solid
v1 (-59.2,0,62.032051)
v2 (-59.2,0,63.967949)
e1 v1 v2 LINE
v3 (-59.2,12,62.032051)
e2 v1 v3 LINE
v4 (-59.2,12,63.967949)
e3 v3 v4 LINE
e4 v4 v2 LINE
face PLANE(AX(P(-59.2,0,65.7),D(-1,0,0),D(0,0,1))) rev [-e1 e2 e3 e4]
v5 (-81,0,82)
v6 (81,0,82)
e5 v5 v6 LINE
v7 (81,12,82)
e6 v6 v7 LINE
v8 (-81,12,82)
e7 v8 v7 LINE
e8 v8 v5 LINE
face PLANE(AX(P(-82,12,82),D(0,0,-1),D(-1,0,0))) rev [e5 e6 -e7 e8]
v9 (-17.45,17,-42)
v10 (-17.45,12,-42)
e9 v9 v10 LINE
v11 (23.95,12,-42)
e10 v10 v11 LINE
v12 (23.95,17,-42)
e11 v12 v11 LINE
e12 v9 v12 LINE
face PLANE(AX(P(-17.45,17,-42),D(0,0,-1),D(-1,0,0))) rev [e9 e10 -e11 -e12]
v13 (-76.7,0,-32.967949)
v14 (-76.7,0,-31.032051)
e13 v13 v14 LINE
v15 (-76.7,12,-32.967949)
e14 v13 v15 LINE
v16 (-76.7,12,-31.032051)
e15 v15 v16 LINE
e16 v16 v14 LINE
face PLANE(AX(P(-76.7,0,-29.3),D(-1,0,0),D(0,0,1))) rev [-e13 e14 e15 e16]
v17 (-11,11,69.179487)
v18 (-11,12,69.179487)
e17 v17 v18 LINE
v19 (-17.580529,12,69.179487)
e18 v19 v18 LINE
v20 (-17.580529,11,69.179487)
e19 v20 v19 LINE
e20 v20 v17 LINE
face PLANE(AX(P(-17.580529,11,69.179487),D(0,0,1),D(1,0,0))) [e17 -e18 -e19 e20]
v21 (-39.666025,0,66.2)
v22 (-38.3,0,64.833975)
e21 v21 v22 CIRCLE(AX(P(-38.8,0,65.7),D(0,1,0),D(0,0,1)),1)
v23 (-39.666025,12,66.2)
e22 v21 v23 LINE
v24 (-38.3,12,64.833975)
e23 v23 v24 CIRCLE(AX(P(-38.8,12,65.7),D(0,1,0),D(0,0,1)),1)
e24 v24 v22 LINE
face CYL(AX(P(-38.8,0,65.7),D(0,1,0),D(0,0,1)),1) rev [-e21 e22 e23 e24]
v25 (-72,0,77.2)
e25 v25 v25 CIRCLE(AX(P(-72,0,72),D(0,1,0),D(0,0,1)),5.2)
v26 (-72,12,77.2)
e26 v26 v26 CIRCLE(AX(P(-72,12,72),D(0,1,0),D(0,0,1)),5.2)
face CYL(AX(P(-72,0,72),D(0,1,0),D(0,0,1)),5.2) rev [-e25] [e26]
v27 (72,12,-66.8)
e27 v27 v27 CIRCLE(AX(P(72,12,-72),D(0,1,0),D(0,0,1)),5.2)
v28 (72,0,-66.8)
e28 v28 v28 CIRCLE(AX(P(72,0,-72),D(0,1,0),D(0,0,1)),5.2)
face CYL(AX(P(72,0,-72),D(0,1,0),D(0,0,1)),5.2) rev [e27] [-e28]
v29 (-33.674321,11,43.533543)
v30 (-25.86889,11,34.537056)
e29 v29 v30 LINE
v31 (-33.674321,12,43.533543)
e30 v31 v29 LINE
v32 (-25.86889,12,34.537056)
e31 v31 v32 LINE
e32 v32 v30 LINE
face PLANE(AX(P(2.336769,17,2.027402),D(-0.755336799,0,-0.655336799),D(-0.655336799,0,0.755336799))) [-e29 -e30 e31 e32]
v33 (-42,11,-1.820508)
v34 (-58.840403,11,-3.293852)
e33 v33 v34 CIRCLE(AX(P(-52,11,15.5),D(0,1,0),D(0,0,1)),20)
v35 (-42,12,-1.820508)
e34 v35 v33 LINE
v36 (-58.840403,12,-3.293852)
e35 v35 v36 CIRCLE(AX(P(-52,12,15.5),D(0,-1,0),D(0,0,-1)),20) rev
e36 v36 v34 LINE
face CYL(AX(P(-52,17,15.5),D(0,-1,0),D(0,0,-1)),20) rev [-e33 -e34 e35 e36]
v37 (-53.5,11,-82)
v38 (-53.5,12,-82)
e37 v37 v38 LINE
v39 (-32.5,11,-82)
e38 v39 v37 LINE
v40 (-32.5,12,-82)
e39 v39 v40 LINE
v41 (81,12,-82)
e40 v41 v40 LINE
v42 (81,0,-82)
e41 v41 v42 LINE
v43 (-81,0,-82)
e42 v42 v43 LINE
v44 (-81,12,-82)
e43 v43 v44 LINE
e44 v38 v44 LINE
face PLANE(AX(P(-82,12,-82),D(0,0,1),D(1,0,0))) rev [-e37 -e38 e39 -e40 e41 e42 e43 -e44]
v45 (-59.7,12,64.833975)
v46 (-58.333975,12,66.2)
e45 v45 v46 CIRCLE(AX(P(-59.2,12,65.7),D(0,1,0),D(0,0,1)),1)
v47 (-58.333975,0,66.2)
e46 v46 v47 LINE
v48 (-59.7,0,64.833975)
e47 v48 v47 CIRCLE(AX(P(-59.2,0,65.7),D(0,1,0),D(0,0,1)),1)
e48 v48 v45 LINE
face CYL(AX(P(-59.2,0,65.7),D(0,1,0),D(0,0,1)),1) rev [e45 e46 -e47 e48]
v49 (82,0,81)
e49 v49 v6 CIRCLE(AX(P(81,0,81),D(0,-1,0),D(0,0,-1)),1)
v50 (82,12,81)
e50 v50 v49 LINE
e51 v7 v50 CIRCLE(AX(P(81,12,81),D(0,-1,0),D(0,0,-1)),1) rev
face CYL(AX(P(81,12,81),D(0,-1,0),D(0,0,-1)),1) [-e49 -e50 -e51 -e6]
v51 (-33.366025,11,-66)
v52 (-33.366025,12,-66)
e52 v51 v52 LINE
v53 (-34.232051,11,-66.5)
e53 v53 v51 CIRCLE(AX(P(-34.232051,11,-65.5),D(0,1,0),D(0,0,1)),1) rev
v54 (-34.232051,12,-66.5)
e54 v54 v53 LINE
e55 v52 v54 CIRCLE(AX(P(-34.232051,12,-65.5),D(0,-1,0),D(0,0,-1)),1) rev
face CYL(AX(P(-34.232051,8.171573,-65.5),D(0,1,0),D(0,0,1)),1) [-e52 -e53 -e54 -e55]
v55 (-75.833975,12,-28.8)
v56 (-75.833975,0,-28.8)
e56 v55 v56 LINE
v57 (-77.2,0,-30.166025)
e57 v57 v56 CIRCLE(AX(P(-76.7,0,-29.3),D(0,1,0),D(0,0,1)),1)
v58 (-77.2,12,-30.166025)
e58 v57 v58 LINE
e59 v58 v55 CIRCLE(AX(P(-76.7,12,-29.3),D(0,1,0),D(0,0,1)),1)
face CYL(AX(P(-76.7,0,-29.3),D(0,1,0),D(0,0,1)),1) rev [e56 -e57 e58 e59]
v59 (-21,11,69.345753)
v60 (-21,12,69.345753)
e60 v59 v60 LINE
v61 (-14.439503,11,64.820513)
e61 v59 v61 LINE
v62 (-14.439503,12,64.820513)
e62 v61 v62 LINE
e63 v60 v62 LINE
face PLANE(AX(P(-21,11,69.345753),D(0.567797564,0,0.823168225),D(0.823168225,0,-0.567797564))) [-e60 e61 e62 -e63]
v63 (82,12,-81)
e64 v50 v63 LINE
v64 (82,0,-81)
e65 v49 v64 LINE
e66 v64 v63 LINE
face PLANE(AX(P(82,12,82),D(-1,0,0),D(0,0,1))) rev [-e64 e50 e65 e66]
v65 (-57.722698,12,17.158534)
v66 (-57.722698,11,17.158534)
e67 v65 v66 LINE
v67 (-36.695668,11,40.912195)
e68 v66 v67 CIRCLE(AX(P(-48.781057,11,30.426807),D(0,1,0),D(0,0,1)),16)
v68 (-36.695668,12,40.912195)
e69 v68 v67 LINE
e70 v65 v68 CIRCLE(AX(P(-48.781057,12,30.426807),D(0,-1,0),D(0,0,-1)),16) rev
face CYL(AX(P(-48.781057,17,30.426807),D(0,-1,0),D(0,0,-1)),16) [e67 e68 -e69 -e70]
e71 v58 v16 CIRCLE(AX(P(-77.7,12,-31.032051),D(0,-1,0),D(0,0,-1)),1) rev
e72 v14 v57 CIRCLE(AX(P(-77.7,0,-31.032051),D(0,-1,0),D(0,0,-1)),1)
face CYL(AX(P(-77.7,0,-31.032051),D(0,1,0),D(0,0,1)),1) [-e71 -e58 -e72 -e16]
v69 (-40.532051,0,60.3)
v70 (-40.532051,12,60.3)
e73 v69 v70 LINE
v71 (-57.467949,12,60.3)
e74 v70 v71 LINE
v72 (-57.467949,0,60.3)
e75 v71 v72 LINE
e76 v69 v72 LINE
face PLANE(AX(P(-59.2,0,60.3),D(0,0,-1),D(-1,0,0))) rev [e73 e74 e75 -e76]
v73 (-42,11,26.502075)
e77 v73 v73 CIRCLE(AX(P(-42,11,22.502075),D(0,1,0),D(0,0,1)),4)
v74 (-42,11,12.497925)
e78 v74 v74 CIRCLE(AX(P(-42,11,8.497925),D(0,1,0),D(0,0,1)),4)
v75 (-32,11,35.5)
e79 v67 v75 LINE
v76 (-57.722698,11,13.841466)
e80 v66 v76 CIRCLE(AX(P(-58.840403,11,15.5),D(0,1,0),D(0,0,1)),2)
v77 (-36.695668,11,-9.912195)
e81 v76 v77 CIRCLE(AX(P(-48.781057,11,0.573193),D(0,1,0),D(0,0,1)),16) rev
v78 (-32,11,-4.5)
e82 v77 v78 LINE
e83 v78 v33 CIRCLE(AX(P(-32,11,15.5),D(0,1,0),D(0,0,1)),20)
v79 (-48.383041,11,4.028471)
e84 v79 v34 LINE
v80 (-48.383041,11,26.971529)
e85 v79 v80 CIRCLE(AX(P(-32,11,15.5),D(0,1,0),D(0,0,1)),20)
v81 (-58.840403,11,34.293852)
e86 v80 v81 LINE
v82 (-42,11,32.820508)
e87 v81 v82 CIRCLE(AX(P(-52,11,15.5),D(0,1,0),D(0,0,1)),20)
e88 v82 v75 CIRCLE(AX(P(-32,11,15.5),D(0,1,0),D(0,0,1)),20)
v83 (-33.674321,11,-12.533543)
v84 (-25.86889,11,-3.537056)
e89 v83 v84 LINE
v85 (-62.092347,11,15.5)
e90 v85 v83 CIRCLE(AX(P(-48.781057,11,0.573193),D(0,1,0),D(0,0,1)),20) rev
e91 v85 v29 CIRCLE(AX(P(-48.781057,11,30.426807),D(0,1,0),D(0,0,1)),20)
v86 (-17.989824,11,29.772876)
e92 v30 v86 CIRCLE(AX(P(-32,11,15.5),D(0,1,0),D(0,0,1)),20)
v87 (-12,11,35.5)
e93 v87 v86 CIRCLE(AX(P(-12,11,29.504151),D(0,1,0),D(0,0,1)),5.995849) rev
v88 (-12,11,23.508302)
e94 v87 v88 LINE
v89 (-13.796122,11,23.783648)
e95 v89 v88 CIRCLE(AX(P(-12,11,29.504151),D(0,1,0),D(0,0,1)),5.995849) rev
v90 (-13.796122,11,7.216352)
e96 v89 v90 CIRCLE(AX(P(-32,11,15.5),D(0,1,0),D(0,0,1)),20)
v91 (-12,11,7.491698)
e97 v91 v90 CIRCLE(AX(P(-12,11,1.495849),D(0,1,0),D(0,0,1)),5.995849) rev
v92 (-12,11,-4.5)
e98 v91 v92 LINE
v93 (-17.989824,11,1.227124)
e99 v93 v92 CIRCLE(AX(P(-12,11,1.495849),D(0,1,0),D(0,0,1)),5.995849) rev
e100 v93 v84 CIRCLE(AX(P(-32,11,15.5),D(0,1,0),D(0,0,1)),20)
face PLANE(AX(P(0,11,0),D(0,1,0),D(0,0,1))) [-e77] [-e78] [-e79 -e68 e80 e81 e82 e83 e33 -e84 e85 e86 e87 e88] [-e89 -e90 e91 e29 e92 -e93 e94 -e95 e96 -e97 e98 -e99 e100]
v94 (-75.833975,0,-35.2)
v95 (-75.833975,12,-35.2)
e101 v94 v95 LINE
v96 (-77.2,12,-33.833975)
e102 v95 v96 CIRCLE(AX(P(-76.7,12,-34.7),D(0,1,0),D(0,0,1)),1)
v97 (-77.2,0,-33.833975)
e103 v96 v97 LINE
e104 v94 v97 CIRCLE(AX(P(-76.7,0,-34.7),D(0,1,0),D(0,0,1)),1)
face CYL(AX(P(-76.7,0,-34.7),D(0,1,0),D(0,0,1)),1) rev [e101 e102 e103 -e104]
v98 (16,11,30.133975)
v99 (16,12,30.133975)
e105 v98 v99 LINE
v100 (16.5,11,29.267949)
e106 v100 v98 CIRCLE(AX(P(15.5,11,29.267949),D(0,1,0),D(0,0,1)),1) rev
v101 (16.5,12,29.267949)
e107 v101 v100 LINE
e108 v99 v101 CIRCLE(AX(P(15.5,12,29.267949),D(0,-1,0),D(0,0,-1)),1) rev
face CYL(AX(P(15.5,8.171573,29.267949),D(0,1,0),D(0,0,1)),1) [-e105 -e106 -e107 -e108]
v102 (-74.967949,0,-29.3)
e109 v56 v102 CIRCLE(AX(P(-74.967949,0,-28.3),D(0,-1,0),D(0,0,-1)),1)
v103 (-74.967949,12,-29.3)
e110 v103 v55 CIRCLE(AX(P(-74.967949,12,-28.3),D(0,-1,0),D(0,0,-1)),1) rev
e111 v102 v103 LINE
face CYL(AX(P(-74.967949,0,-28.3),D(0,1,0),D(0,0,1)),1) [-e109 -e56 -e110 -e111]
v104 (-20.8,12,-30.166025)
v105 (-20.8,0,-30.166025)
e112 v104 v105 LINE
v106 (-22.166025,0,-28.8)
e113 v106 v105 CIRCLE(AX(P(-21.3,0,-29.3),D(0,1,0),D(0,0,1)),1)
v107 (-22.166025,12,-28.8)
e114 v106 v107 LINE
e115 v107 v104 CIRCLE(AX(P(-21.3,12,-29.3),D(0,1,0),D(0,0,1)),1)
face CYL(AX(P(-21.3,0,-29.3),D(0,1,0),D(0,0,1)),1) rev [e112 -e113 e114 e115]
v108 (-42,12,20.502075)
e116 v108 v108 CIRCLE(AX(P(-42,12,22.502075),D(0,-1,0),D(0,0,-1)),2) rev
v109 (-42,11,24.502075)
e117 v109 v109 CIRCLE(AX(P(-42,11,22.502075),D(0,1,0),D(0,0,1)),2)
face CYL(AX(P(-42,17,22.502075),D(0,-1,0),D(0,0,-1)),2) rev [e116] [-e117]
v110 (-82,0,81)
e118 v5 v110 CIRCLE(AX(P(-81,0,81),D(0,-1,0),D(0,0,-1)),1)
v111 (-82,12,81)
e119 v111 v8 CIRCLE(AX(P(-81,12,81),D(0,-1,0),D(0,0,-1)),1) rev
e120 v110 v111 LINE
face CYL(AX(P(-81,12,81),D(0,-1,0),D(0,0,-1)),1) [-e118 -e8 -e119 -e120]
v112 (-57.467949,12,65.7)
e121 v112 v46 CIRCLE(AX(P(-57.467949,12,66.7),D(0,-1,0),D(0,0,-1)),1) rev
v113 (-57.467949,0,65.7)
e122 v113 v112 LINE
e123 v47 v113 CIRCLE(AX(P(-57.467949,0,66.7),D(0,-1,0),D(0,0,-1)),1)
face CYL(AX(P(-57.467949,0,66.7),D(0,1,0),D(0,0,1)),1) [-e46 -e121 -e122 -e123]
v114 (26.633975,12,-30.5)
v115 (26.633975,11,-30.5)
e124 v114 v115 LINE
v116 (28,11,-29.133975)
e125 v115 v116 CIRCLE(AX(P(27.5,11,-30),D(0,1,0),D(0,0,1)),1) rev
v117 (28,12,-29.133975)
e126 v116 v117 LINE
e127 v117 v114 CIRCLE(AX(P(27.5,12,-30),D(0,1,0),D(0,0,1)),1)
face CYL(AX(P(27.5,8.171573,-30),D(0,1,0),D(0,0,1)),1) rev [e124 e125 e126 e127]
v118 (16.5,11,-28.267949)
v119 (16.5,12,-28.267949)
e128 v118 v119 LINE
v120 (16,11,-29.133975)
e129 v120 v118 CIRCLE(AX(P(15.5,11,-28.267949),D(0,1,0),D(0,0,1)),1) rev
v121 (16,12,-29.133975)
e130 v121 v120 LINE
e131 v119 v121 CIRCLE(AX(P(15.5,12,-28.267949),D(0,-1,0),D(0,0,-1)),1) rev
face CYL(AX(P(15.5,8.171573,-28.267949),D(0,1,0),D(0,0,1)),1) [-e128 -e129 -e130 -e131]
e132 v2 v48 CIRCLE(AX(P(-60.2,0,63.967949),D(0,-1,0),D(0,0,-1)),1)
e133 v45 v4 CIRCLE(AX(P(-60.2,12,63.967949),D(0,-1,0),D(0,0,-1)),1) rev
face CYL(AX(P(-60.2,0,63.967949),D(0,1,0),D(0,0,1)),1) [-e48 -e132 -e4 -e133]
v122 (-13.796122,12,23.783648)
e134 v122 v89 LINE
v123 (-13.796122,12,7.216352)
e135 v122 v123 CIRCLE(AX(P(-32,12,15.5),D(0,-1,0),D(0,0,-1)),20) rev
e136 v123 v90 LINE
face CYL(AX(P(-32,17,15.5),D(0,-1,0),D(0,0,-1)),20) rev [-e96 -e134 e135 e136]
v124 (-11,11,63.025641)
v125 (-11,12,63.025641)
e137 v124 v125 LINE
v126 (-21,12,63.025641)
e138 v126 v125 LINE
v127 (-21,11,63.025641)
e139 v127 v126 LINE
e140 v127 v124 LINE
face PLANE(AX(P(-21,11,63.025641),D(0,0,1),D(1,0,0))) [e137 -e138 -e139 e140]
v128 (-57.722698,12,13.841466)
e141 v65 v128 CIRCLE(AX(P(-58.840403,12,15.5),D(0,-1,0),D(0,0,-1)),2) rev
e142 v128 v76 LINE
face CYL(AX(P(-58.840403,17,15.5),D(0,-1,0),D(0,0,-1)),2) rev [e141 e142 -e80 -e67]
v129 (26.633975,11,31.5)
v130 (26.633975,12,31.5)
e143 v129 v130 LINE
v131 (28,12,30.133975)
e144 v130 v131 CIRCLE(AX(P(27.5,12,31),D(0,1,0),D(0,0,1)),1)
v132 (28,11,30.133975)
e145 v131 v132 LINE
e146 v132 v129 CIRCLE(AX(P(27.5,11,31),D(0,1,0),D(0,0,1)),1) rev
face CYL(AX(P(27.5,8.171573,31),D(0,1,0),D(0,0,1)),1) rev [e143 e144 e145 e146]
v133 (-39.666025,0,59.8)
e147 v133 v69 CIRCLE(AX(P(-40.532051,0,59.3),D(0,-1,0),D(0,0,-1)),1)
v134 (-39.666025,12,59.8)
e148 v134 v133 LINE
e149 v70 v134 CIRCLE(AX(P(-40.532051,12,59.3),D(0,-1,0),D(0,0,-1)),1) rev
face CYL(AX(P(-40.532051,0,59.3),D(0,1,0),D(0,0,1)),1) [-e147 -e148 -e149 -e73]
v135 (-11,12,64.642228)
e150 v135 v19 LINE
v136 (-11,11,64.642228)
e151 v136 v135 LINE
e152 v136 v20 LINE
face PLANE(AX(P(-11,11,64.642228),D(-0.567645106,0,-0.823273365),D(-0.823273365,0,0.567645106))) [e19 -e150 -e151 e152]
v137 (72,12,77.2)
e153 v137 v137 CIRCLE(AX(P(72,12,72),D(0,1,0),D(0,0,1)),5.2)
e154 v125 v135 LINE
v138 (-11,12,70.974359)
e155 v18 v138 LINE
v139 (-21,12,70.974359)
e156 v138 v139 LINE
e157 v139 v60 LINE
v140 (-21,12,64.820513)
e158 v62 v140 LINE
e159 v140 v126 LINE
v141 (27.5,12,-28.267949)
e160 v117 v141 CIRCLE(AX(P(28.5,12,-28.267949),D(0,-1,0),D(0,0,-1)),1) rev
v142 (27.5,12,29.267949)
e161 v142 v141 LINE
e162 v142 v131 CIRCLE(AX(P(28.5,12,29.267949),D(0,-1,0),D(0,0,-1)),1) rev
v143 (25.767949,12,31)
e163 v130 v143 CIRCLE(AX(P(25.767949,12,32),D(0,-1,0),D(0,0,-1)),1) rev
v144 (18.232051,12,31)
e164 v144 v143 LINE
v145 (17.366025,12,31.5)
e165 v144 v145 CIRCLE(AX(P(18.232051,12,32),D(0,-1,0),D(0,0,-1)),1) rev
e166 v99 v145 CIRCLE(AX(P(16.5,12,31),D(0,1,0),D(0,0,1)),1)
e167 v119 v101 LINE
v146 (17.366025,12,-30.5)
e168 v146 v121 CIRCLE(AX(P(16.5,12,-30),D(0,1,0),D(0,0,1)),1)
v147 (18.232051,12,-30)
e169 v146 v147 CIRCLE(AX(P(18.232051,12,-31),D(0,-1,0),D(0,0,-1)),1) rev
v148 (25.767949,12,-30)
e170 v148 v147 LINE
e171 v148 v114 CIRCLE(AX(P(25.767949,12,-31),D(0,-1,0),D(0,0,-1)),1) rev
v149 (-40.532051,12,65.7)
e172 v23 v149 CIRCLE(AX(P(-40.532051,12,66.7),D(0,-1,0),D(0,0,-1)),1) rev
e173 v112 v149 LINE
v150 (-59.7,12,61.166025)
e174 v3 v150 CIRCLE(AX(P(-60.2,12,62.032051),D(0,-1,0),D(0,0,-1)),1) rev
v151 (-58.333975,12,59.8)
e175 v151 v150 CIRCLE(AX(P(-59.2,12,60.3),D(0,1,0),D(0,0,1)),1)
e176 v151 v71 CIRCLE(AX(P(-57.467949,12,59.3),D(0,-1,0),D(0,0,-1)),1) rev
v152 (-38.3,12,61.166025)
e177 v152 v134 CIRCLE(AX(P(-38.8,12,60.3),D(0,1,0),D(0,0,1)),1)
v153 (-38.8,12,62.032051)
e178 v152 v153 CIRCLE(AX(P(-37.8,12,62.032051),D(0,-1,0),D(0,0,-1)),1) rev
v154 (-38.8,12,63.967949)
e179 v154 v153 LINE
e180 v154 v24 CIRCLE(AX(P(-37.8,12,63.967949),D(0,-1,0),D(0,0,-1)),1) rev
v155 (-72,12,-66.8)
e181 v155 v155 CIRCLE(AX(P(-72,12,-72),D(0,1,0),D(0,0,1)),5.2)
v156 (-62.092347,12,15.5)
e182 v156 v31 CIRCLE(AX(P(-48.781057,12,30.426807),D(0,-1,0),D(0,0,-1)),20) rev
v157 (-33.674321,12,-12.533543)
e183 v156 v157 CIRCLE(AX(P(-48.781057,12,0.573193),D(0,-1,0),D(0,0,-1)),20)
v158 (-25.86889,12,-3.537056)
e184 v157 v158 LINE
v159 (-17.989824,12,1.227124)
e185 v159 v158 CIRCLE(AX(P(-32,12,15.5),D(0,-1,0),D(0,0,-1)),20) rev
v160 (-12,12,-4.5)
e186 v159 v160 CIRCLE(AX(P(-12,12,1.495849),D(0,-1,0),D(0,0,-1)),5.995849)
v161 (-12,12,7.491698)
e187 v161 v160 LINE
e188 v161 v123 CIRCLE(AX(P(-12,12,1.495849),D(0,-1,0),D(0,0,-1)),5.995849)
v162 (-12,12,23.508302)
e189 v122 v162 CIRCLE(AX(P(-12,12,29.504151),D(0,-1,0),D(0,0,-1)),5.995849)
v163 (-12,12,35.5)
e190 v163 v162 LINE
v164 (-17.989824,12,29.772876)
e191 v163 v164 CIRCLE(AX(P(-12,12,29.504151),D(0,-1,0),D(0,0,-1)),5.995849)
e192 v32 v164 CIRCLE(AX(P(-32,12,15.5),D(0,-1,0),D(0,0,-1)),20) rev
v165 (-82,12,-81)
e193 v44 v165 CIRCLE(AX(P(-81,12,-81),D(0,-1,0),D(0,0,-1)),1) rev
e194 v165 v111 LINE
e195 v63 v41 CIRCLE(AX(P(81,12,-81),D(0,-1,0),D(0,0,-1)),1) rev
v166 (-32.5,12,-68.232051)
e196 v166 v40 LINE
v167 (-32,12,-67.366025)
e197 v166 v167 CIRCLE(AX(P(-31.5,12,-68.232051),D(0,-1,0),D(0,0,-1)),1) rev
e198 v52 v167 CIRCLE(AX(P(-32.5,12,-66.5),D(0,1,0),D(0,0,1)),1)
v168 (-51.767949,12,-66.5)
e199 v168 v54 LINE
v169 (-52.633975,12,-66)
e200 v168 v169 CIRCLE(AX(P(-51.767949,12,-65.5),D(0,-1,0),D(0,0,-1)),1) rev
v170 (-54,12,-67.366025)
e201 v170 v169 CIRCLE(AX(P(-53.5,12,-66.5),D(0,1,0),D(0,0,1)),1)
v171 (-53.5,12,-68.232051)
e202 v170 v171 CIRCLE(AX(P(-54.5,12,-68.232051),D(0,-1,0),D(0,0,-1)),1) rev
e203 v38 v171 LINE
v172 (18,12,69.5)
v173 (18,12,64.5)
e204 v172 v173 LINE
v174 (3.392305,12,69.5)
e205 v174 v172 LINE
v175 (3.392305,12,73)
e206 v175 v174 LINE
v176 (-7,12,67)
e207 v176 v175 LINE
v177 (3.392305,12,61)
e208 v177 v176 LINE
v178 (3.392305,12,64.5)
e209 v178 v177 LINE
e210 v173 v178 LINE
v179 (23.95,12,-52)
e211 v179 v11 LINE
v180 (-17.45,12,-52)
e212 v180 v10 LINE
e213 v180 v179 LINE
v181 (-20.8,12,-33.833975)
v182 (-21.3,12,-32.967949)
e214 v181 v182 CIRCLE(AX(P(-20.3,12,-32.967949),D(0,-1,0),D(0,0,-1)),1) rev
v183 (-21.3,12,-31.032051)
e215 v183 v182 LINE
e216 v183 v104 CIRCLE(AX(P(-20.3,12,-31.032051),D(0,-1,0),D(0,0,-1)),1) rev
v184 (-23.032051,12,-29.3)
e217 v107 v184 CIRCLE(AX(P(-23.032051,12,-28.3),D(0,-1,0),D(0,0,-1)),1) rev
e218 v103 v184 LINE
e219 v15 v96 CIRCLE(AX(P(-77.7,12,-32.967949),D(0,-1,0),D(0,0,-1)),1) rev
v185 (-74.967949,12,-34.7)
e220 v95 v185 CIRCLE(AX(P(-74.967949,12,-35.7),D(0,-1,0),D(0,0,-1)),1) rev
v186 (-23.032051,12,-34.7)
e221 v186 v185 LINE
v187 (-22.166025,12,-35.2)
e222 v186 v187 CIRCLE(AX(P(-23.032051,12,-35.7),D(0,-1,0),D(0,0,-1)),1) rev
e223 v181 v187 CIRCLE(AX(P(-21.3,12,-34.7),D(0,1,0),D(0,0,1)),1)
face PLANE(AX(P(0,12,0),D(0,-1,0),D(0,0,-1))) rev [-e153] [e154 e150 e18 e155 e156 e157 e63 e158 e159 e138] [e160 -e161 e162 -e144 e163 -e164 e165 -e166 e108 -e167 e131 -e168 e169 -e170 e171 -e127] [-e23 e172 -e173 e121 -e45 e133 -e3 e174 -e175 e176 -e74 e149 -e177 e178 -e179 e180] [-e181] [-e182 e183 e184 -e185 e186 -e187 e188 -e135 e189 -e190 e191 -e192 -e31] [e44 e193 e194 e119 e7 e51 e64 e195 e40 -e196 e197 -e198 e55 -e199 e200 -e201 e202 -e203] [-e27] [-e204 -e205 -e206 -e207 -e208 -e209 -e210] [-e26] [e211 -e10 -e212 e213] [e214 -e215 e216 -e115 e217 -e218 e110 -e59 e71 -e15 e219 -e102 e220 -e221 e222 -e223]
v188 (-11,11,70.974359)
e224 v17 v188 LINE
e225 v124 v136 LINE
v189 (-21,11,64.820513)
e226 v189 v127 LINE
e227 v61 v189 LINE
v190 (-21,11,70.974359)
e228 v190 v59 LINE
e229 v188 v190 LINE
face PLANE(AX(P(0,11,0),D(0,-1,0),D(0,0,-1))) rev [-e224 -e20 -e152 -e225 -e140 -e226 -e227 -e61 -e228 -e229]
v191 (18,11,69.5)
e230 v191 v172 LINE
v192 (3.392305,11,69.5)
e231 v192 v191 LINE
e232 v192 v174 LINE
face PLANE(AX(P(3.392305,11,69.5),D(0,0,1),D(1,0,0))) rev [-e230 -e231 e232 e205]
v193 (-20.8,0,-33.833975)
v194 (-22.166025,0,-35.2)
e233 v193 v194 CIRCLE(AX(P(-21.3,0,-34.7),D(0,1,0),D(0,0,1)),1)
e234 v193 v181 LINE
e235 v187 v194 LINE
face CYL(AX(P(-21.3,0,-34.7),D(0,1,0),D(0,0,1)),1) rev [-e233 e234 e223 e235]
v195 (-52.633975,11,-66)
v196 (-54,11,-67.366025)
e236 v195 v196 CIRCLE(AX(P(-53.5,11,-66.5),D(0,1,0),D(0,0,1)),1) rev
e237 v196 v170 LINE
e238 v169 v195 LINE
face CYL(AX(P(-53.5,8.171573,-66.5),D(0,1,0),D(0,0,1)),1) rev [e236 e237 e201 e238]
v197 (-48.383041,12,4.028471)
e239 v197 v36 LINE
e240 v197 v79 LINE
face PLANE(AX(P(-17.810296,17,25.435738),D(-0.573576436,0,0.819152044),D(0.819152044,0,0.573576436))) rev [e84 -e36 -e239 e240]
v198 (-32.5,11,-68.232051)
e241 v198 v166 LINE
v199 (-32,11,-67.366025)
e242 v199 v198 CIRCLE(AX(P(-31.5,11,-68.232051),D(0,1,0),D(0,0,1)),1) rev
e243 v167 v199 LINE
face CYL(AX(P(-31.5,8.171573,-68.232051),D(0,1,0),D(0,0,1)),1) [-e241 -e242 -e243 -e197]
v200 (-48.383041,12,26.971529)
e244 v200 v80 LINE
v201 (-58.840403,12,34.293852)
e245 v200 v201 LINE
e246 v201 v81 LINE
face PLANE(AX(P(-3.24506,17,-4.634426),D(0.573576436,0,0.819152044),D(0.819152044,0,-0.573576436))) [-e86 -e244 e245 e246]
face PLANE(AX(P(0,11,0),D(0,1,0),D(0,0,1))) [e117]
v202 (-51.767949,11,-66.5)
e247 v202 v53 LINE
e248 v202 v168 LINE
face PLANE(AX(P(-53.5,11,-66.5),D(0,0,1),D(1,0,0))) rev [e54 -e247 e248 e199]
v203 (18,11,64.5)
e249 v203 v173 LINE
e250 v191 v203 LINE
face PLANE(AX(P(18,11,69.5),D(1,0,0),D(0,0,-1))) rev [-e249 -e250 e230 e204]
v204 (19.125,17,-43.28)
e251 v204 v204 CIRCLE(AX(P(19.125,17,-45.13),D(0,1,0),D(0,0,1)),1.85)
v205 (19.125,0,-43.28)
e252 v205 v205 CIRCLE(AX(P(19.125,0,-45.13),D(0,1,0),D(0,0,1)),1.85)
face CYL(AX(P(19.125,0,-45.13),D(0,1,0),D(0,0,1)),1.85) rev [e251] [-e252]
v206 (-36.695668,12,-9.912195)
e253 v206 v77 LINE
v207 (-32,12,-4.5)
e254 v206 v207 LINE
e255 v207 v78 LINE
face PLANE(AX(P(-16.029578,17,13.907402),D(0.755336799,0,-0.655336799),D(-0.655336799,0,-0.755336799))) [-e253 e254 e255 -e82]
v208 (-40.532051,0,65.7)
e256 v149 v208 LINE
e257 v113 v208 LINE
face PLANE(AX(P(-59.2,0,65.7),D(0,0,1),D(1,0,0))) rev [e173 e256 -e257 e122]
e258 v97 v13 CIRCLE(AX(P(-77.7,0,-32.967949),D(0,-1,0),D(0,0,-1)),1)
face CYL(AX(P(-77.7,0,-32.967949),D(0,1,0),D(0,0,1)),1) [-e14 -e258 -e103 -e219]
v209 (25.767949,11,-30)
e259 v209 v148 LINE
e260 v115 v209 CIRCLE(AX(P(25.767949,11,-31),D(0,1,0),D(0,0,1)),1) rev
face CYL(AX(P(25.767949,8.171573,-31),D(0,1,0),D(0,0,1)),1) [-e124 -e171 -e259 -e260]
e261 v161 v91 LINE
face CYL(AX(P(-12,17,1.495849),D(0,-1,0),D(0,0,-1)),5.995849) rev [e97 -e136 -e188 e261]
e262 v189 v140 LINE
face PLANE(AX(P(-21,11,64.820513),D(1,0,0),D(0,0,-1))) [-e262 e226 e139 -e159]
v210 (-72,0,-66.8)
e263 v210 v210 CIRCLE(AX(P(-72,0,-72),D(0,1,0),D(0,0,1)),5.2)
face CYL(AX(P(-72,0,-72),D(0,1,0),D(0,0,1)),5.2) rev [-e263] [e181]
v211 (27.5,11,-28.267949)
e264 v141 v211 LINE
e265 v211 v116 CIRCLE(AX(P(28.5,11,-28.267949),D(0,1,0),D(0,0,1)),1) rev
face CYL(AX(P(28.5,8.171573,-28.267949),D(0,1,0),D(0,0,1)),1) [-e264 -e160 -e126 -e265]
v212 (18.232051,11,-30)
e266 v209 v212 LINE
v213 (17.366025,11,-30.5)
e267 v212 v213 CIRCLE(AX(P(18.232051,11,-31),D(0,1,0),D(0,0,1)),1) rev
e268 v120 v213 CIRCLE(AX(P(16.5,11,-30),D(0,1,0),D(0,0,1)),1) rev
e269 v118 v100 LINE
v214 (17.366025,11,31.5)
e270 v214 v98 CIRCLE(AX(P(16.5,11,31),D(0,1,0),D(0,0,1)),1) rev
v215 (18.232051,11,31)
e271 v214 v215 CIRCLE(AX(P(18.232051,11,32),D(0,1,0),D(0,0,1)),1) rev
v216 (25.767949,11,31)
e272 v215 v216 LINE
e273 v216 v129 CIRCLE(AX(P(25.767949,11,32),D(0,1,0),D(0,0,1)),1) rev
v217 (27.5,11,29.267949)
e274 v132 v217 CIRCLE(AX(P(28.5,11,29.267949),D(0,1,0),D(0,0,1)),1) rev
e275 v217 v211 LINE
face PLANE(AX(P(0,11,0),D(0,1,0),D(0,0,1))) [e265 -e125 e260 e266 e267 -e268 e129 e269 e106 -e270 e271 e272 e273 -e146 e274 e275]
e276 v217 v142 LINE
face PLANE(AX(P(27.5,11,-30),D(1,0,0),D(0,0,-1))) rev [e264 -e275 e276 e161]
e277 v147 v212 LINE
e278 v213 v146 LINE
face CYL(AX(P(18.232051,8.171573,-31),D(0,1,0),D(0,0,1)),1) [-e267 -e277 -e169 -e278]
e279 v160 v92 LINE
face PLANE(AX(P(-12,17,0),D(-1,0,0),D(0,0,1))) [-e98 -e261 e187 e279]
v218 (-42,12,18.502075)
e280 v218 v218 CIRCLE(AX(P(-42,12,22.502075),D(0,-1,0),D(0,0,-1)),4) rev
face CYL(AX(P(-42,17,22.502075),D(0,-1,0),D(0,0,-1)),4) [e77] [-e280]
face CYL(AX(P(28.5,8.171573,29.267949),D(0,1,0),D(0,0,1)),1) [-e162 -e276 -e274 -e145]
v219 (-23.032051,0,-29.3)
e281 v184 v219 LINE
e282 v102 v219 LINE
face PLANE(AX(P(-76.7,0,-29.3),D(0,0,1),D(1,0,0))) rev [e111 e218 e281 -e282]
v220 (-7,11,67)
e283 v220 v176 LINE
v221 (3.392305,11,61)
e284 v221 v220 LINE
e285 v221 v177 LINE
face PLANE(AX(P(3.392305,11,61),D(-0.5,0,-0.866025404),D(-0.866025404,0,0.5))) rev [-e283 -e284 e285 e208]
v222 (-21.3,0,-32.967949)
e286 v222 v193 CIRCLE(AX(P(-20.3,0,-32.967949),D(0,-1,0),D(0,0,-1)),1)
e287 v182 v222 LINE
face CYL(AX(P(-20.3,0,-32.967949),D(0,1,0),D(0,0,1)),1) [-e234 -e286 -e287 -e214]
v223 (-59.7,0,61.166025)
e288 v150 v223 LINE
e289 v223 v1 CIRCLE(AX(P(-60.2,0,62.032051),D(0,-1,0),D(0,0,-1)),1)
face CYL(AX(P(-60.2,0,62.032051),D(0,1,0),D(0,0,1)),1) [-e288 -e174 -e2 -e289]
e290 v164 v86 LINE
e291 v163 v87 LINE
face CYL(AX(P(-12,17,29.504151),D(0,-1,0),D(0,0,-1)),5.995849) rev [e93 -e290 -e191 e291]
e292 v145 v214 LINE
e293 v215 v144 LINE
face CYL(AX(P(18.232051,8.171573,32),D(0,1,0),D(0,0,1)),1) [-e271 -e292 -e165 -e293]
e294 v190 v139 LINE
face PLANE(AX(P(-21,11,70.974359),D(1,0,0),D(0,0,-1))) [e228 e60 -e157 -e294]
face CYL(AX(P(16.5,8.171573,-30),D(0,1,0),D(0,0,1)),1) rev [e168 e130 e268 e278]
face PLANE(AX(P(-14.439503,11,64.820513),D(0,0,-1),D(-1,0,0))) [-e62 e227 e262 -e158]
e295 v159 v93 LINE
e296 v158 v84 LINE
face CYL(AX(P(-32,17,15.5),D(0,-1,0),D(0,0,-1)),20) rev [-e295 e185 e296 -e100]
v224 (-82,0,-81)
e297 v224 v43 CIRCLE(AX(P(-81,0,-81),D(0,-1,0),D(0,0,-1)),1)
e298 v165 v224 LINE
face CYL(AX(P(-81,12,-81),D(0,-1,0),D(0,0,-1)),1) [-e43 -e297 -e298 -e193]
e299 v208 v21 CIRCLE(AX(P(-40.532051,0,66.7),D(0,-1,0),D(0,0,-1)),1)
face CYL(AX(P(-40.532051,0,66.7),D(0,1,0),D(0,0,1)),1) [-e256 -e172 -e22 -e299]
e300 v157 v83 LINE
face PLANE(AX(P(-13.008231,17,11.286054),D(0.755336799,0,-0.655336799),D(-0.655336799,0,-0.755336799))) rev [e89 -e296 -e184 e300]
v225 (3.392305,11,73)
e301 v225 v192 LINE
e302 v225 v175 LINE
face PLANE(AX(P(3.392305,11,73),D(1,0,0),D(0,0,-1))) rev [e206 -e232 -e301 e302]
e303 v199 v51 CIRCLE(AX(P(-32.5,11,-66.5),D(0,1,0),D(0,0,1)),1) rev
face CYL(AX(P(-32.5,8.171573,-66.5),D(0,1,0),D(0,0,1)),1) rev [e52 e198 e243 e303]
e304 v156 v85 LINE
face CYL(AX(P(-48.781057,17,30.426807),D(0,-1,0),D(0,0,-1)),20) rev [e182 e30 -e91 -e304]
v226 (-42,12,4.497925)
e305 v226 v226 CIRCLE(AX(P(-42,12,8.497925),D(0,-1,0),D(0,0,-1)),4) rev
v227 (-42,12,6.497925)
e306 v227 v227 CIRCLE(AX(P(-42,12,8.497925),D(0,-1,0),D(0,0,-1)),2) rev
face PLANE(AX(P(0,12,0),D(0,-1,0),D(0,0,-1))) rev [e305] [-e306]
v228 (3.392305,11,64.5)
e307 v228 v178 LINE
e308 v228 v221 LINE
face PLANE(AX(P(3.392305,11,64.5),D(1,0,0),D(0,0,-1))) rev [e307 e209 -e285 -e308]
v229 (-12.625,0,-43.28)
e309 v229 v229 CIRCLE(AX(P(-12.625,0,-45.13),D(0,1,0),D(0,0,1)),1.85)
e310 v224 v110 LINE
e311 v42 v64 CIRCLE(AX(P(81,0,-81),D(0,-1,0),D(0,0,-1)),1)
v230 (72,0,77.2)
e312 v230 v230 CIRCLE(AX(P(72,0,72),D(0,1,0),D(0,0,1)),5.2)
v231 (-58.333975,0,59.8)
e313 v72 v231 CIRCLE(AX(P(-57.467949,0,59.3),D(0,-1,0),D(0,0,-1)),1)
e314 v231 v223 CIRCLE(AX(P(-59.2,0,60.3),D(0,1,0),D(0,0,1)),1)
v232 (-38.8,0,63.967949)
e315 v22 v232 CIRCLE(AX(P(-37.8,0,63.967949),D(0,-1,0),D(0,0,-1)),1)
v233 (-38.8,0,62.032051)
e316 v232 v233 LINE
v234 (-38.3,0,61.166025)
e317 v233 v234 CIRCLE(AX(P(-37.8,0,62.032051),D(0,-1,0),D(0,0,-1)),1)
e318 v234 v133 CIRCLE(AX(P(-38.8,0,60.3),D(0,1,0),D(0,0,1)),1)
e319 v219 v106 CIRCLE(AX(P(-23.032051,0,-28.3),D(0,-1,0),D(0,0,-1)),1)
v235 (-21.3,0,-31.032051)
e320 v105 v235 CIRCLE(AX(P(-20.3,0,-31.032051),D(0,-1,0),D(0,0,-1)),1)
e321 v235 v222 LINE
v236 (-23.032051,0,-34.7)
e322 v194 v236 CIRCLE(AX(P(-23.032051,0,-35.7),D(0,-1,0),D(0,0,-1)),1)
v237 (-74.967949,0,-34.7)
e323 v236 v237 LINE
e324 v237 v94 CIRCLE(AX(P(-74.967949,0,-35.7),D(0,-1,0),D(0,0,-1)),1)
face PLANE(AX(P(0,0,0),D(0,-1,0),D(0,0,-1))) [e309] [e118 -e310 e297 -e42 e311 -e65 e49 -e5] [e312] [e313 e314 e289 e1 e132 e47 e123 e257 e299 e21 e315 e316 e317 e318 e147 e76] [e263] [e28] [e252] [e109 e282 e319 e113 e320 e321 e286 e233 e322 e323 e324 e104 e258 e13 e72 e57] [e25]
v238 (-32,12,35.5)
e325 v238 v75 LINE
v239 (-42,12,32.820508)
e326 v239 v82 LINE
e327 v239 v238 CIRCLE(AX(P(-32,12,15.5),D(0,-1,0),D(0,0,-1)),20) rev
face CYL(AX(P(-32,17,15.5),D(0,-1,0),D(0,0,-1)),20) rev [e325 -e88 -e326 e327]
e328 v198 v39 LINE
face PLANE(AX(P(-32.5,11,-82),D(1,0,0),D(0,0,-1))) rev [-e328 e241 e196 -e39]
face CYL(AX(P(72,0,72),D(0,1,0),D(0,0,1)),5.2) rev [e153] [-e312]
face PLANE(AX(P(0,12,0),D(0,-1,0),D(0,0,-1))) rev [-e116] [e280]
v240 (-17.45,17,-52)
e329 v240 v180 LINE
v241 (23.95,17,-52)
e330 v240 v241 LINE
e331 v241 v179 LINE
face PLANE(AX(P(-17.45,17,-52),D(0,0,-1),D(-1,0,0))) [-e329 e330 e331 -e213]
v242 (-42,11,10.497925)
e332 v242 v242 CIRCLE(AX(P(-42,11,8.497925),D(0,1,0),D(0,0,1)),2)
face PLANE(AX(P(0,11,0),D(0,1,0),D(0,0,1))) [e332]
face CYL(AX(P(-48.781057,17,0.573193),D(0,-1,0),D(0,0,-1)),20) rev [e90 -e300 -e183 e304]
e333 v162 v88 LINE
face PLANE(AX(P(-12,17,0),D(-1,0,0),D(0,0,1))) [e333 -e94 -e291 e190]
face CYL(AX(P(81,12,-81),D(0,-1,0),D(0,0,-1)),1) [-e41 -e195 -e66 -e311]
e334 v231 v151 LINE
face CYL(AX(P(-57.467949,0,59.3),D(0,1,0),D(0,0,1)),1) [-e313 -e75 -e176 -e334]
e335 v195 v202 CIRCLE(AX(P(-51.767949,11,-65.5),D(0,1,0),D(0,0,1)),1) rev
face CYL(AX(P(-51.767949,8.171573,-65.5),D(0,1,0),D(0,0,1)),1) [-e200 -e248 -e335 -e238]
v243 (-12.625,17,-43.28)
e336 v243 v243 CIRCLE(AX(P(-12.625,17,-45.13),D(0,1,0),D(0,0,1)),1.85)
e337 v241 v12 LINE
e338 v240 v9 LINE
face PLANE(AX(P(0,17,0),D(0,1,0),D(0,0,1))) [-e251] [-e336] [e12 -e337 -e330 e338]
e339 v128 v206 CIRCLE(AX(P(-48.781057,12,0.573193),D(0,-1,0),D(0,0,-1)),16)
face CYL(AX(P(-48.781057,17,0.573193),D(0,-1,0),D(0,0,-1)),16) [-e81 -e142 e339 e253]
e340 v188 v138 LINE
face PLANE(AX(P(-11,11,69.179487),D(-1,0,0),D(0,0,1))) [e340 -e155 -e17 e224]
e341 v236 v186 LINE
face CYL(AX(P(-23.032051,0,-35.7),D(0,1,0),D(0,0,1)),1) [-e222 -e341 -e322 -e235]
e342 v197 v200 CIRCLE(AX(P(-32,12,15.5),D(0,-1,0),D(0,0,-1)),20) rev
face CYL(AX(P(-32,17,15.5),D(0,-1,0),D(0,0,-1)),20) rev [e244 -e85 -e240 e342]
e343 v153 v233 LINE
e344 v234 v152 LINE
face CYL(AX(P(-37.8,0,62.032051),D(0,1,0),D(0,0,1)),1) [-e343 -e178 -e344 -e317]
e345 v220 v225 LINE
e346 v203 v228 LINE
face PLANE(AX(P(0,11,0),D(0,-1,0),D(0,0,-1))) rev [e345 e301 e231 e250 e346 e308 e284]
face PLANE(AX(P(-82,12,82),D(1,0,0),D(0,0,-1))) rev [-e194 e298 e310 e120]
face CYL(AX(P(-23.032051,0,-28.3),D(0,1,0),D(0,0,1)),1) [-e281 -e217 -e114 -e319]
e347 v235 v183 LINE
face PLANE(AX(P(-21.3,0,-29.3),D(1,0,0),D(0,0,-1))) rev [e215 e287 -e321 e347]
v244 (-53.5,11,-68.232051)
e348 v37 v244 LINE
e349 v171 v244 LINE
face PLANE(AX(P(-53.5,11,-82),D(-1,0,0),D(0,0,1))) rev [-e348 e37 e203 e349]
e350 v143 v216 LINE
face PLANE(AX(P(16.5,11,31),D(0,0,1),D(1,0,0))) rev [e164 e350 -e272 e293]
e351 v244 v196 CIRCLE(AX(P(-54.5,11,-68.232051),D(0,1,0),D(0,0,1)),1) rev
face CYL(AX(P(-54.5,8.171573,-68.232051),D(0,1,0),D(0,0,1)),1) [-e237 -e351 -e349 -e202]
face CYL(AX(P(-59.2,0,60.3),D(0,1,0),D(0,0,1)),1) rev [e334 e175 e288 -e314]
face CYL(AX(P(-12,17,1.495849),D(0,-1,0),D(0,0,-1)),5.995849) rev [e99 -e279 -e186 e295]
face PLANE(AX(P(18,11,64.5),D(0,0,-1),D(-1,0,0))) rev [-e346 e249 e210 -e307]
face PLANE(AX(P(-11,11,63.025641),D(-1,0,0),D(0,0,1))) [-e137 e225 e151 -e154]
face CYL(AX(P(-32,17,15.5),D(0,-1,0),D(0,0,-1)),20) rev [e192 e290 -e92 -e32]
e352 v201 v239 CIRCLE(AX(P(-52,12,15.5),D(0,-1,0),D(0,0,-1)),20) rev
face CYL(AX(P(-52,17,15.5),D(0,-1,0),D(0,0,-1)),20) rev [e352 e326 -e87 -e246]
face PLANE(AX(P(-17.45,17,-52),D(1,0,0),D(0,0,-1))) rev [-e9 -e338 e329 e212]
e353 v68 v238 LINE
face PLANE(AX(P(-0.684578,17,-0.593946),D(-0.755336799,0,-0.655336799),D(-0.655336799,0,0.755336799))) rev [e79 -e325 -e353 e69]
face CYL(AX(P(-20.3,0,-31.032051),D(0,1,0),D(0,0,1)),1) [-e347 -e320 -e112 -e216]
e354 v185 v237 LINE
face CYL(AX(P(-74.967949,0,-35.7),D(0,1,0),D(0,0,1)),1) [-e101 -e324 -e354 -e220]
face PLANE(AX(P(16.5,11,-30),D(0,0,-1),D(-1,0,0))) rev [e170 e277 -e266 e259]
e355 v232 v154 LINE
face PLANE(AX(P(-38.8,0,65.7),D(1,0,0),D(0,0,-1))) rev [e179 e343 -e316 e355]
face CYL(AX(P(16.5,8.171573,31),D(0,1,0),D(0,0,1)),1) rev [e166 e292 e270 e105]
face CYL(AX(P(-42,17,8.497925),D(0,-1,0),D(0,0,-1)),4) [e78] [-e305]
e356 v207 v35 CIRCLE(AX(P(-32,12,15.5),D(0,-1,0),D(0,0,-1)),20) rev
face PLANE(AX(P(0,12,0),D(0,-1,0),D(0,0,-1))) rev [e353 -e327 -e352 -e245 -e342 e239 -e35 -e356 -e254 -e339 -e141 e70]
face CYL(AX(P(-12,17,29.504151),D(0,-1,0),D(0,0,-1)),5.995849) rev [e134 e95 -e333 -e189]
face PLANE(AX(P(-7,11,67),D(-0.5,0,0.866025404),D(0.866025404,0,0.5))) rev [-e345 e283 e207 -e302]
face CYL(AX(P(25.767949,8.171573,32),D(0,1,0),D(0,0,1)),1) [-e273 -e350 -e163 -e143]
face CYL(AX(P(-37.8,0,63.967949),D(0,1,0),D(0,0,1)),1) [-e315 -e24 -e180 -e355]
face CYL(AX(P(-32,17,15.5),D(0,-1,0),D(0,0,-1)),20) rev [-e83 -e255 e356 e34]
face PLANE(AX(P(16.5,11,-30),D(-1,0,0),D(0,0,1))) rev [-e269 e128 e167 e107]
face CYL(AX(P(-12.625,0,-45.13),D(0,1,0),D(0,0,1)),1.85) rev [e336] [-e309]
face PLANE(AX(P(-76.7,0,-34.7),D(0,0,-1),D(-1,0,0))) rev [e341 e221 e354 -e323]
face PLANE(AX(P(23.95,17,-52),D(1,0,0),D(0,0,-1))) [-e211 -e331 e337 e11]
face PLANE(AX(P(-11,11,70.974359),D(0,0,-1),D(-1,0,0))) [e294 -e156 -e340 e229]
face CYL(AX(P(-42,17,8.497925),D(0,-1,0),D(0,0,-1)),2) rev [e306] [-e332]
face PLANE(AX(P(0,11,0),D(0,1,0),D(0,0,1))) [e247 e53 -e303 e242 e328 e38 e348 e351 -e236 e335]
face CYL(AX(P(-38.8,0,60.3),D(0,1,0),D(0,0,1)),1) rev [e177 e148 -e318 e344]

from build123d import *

# Parameters (mm, degrees)
SKICA1_W                        = 164
SKICA1_H                        = 164
P_IDAT_VYSUNUT_M1_DEPTH         = 12
SKICA2_R                        = 5.2
ODEBRAT_VYSUNUT_M1_DEPTH        = 117.584733134
SKICA3_W                        = 55.4
SKICA3_H                        = 5.4
SKICA3_W_2                      = 20.4
ODEBRAT_VYSUNUT_M2_DEPTH        = 117.584733134
ODEBRAT_VYSUNUT_M3_DEPTH        = 1
ZAOBLIT1_R                      = 1
SKICA10_W                       = 41.4
SKICA10_H                       = 10
P_IDAT_VYSUNUT_M2_DEPTH         = 5
ODEBRAT_VYSUNUT_M6_DEPTH        = 117.584733134
ODEBRAT_VYSUNUT_M6_DEPTH_BACK   = 117.584733134
SKICA10_3_R                     = 1.85
SKICA11_W                       = 21
SKICA11_H                       = 15.5
SKICA11_W_2                     = 11
SKICA11_H_2                     = 61
ODEBRAT_VYSUNUT_M7_DEPTH        = 1
SKICA12_R                       = 1
ODEBRAT_VYSUNUT_M8_DEPTH        = 117.584733134
ZAOBLIT2_R                      = 1
SKICA13_R                       = 1
ODEBRAT_VYSUNUT_M9_DEPTH        = 1
ZAOBLIT3_R                      = 1
ODEBRAT_START                   = 11
ODEBRAT_VYSUNUT_M11_OUTLINE_R   = 4
ODEBRAT_VYSUNUT_M11_OUTLINE_R_2 = 2
ODEBRAT_VYSUNUT_M11_DEPTH       = 1


# Read off the part's stored shape, not the designer's step: Odebrat vysunutím11
with BuildPart() as part:
    # Skica1 → Přidat vysunutím1 (new body)
    with BuildSketch(Plane(origin=(0, 0, 0), x_dir=(1, 0, 0), z_dir=(0, 1, 0))):
        Rectangle(SKICA1_W, SKICA1_H)
    extrude(amount=P_IDAT_VYSUNUT_M1_DEPTH)

    # Skica2 → Odebrat vysunutím1 (cut, through all)
    with BuildSketch(Plane(origin=(0, 12, 0), x_dir=(1, 0, 0), z_dir=(0, 1, 0))):
        with Locations(Location((-72, 72, 0), (0, 0, 270))):
            Circle(SKICA2_R)
        with Locations(Location((72, 72, 0), (0, 0, 270))):
            Circle(SKICA2_R)
        with Locations(Location((-72, -72, 0), (0, 0, 270))):
            Circle(SKICA2_R)
        with Locations(Location((72, -72, 0), (0, 0, 270))):
            Circle(SKICA2_R)
    extrude(amount=-ODEBRAT_VYSUNUT_M1_DEPTH, mode=Mode.SUBTRACT)

    # Skica3 → Odebrat vysunutím2 (cut, through all)
    with BuildSketch(Plane(origin=(0, 12, 0), x_dir=(1, 0, 0), z_dir=(0, 1, 0))):
        with Locations((-49, 32)):
            Rectangle(SKICA3_W, SKICA3_H)
        with Locations((-49, -63)):
            Rectangle(SKICA3_W_2, SKICA3_H)
    extrude(amount=-ODEBRAT_VYSUNUT_M2_DEPTH, mode=Mode.SUBTRACT)

    # Skica4 → Odebrat vysunutím3 (cut)
    with BuildSketch(Plane(origin=(0, 12, 0), x_dir=(1, 0, 0), z_dir=(0, 1, 0))):
        Polygon((3.392304845, -61), (-7, -67), (3.392304845, -73), (3.392304845, -69.5), (18, -69.5), (18, -64.5), (3.392304845, -64.5), align=None)
        Polygon((-11, -63.025641026), (-11, -64.642227564), (-17.580528846, -69.179487179), (-11, -69.179487179), (-11, -70.974358974), (-21, -70.974358974), (-21, -69.345753205), (-14.439503205, -64.820512821), (-21, -64.820512821), (-21, -63.025641026), align=None)
    extrude(amount=-ODEBRAT_VYSUNUT_M3_DEPTH, mode=Mode.SUBTRACT)

    # Zaoblit1
    zaoblit1_edges = [part.edges().sort_by_distance(p)[0] for p in [
        (82, 6, 82),
        (-82, 6, 82),
        (-82, 6, -82),
        (82, 6, -82),
    ]]
    fillet(zaoblit1_edges, radius=ZAOBLIT1_R)

    # Skica10 → Přidat vysunutím2 (add)
    with BuildSketch(Plane(origin=(0, 12, 0), x_dir=(1, 0, 0), z_dir=(0, 1, 0))):
        with Locations((3.25, 47)):
            Rectangle(SKICA10_W, SKICA10_H)
    extrude(amount=P_IDAT_VYSUNUT_M2_DEPTH)

    # Skica10<3> → Odebrat vysunutím6 (cut, two sides: drawn at the far end of the back side and taken through both)
    with BuildSketch(Plane(origin=(0, 12, 0), x_dir=(1, 0, 0), z_dir=(0, 1, 0)).offset(-ODEBRAT_VYSUNUT_M6_DEPTH_BACK)):
        with Locations(Location((-12.625, 45.13, 0), (0, 0, 270))):
            Circle(SKICA10_3_R)
        with Locations(Location((19.125, 45.13, 0), (0, 0, 270))):
            Circle(SKICA10_3_R)
    extrude(amount=ODEBRAT_VYSUNUT_M6_DEPTH + ODEBRAT_VYSUNUT_M6_DEPTH_BACK, mode=Mode.SUBTRACT)

    # Skica11 → Odebrat vysunutím7 (cut)
    with BuildSketch(Plane(origin=(0, 12, 0), x_dir=(1, 0, 0), z_dir=(0, 1, 0))):
        with Locations((-43, 74.25)):
            Rectangle(SKICA11_W, SKICA11_H)
        with Locations((22, -0.5)):
            Rectangle(SKICA11_W_2, SKICA11_H_2)
    extrude(amount=-ODEBRAT_VYSUNUT_M7_DEPTH, mode=Mode.SUBTRACT)

    # Skica12 → Odebrat vysunutím8 (cut, through all)
    with BuildSketch(Plane(origin=(0, 12, 0), x_dir=(1, 0, 0), z_dir=(0, 1, 0))):
        with Locations((-76.7, 34.7)):
            Circle(SKICA12_R)
        with Locations((-76.7, 29.3)):
            Circle(SKICA12_R)
        with Locations((-21.3, 29.3)):
            Circle(SKICA12_R)
        with Locations((-21.3, 34.7)):
            Circle(SKICA12_R)
        with Locations((-59.2, -60.3)):
            Circle(SKICA12_R)
        with Locations((-59.2, -65.7)):
            Circle(SKICA12_R)
        with Locations((-38.8, -65.7)):
            Circle(SKICA12_R)
        with Locations((-38.8, -60.3)):
            Circle(SKICA12_R)
    extrude(amount=-ODEBRAT_VYSUNUT_M8_DEPTH, mode=Mode.SUBTRACT)

    # Zaoblit2
    zaoblit2_edges = [part.edges().sort_by_distance(p)[0] for p in [
        (-75.7, 6, -34.7),
        (-22.3, 6, -34.7),
        (-76.7, 6, -30.3),
        (-22.3, 6, -29.3),
        (-39.8, 6, 60.3),
        (-58.2, 6, 60.3),
        (-59.2, 6, 64.7),
        (-39.8, 6, 65.7),
        (-59.2, 6, 61.3),
        (-21.3, 6, -33.7),
        (-21.3, 6, -30.3),
        (-75.7, 6, -29.3),
        (-58.2, 6, 65.7),
        (-38.8, 6, 64.7),
        (-38.8, 6, 61.3),
        (-76.7, 6, -33.7),
    ]]
    fillet(zaoblit2_edges, radius=ZAOBLIT2_R)

    # Skica13 → Odebrat vysunutím9 (cut)
    with BuildSketch(Plane(origin=(0, 12, 0), x_dir=(1, 0, 0), z_dir=(0, 1, 0))):
        with Locations((-53.5, 66.5)):
            Circle(SKICA13_R)
        with Locations((-32.5, 66.5)):
            Circle(SKICA13_R)
        with Locations((16.5, 30)):
            Circle(SKICA13_R)
        with Locations((27.5, 30)):
            Circle(SKICA13_R)
        with Locations((16.5, -31)):
            Circle(SKICA13_R)
        with Locations((27.5, -31)):
            Circle(SKICA13_R)
    extrude(amount=-ODEBRAT_VYSUNUT_M9_DEPTH, mode=Mode.SUBTRACT)

    # Zaoblit3
    zaoblit3_edges = [part.edges().sort_by_distance(p)[0] for p in [
        (-53.5, 11.5, -67.5),
        (-52.5, 11.5, -66.5),
        (27.5, 11.5, 30),
        (26.5, 11.5, 31),
        (-32.5, 11.5, -67.5),
        (-33.5, 11.5, -66.5),
        (16.5, 11.5, -29),
        (17.5, 11.5, -30),
        (26.5, 11.5, -30),
        (27.5, 11.5, -29),
        (16.5, 11.5, 30),
        (17.5, 11.5, 31),
    ]]
    fillet(zaoblit3_edges, radius=ZAOBLIT3_R)

    # Odebrat vysunutím11 outline → Odebrat vysunutím11 (cut)
    # profile 1 of 3: a face of its own
    with BuildSketch(Plane(origin=(0, 0, 0), x_dir=(1, 0, 0), z_dir=(0, 1, 0)).offset(ODEBRAT_START)):
        with BuildLine():
            ThreePointArc((-25.86889032, -34.537055815), (-21.651463985, -32.614549434), (-17.989824292, -29.772875555))
            ThreePointArc((-17.989824292, -29.772875555), (-16.143608013, -33.837823652), (-12, -35.5))
            Line((-12, -35.5), (-12, -23.508301528))
            ThreePointArc((-12, -23.508301528), (-12.908552323, -23.577537842), (-13.796121859, -23.783647786))
            ThreePointArc((-13.796121859, -23.783647786), (-12, -15.5), (-13.796121859, -7.216352214))
            ThreePointArc((-13.796121859, -7.216352214), (-12.908552323, -7.422462158), (-12, -7.491698472))
            Line((-12, -7.491698472), (-12, 4.5))
            ThreePointArc((-12, 4.5), (-16.143608013, 2.837823652), (-17.989824292, -1.227124445))
            ThreePointArc((-17.989824292, -1.227124445), (-21.651463985, 1.614549434), (-25.86889032, 3.537055815))
            Line((-25.86889032, 3.537055815), (-33.674320761, 12.533542588))
            ThreePointArc((-33.674320761, 12.533542588), (-62.826546549, 13.664932048), (-62.092346854, -15.5))
            ThreePointArc((-62.092346854, -15.5), (-62.826546549, -44.664932048), (-33.674320761, -43.533542588))
            Line((-33.674320761, -43.533542588), (-25.86889032, -34.537055815))
        make_face()
        with Locations((-42, -22.502075382)):
            Circle(ODEBRAT_VYSUNUT_M11_OUTLINE_R, mode=Mode.SUBTRACT)
        with BuildLine():
            ThreePointArc((-57.722697741, -17.158534068), (-56.840402867, -15.5), (-57.722697741, -13.841465932))
            ThreePointArc((-57.722697741, -13.841465932), (-60.761452982, 10.031999011), (-36.695667957, 9.912195392))
            Line((-36.695667957, 9.912195392), (-32, 4.5))
            ThreePointArc((-32, 4.5), (-37.176380902, 3.818516526), (-42, 1.820508076))
            ThreePointArc((-42, 1.820508076), (-50.256885145, 4.423893962), (-58.840402867, 3.293852416))
            Line((-58.840402867, 3.293852416), (-48.383040886, -4.028471273))
            ThreePointArc((-48.383040886, -4.028471273), (-52, -15.5), (-48.383040886, -26.971528727))
            Line((-48.383040886, -26.971528727), (-58.840402867, -34.293852416))
            ThreePointArc((-58.840402867, -34.293852416), (-50.256885145, -35.423893962), (-42, -32.820508076))
            ThreePointArc((-42, -32.820508076), (-37.176380902, -34.818516526), (-32, -35.5))
            Line((-32, -35.5), (-36.695667957, -40.912195392))
            ThreePointArc((-36.695667957, -40.912195392), (-60.761452982, -41.031999011), (-57.722697741, -17.158534068))
        make_face(mode=Mode.SUBTRACT)
        with Locations((-42, -8.497924618)):
            Circle(ODEBRAT_VYSUNUT_M11_OUTLINE_R, mode=Mode.SUBTRACT)
    # profile 2 of 3: a face of its own
    with BuildSketch(Plane(origin=(0, 0, 0), x_dir=(1, 0, 0), z_dir=(0, 1, 0)).offset(ODEBRAT_START)):
        with Locations((-42, -22.502075382)):
            Circle(ODEBRAT_VYSUNUT_M11_OUTLINE_R_2)
    # profile 3 of 3: a face of its own
    with BuildSketch(Plane(origin=(0, 0, 0), x_dir=(1, 0, 0), z_dir=(0, 1, 0)).offset(ODEBRAT_START)):
        with Locations((-42, -8.497924618)):
            Circle(ODEBRAT_VYSUNUT_M11_OUTLINE_R_2)
    extrude(amount=ODEBRAT_VYSUNUT_M11_DEPTH, mode=Mode.SUBTRACT)


solid = part.part
